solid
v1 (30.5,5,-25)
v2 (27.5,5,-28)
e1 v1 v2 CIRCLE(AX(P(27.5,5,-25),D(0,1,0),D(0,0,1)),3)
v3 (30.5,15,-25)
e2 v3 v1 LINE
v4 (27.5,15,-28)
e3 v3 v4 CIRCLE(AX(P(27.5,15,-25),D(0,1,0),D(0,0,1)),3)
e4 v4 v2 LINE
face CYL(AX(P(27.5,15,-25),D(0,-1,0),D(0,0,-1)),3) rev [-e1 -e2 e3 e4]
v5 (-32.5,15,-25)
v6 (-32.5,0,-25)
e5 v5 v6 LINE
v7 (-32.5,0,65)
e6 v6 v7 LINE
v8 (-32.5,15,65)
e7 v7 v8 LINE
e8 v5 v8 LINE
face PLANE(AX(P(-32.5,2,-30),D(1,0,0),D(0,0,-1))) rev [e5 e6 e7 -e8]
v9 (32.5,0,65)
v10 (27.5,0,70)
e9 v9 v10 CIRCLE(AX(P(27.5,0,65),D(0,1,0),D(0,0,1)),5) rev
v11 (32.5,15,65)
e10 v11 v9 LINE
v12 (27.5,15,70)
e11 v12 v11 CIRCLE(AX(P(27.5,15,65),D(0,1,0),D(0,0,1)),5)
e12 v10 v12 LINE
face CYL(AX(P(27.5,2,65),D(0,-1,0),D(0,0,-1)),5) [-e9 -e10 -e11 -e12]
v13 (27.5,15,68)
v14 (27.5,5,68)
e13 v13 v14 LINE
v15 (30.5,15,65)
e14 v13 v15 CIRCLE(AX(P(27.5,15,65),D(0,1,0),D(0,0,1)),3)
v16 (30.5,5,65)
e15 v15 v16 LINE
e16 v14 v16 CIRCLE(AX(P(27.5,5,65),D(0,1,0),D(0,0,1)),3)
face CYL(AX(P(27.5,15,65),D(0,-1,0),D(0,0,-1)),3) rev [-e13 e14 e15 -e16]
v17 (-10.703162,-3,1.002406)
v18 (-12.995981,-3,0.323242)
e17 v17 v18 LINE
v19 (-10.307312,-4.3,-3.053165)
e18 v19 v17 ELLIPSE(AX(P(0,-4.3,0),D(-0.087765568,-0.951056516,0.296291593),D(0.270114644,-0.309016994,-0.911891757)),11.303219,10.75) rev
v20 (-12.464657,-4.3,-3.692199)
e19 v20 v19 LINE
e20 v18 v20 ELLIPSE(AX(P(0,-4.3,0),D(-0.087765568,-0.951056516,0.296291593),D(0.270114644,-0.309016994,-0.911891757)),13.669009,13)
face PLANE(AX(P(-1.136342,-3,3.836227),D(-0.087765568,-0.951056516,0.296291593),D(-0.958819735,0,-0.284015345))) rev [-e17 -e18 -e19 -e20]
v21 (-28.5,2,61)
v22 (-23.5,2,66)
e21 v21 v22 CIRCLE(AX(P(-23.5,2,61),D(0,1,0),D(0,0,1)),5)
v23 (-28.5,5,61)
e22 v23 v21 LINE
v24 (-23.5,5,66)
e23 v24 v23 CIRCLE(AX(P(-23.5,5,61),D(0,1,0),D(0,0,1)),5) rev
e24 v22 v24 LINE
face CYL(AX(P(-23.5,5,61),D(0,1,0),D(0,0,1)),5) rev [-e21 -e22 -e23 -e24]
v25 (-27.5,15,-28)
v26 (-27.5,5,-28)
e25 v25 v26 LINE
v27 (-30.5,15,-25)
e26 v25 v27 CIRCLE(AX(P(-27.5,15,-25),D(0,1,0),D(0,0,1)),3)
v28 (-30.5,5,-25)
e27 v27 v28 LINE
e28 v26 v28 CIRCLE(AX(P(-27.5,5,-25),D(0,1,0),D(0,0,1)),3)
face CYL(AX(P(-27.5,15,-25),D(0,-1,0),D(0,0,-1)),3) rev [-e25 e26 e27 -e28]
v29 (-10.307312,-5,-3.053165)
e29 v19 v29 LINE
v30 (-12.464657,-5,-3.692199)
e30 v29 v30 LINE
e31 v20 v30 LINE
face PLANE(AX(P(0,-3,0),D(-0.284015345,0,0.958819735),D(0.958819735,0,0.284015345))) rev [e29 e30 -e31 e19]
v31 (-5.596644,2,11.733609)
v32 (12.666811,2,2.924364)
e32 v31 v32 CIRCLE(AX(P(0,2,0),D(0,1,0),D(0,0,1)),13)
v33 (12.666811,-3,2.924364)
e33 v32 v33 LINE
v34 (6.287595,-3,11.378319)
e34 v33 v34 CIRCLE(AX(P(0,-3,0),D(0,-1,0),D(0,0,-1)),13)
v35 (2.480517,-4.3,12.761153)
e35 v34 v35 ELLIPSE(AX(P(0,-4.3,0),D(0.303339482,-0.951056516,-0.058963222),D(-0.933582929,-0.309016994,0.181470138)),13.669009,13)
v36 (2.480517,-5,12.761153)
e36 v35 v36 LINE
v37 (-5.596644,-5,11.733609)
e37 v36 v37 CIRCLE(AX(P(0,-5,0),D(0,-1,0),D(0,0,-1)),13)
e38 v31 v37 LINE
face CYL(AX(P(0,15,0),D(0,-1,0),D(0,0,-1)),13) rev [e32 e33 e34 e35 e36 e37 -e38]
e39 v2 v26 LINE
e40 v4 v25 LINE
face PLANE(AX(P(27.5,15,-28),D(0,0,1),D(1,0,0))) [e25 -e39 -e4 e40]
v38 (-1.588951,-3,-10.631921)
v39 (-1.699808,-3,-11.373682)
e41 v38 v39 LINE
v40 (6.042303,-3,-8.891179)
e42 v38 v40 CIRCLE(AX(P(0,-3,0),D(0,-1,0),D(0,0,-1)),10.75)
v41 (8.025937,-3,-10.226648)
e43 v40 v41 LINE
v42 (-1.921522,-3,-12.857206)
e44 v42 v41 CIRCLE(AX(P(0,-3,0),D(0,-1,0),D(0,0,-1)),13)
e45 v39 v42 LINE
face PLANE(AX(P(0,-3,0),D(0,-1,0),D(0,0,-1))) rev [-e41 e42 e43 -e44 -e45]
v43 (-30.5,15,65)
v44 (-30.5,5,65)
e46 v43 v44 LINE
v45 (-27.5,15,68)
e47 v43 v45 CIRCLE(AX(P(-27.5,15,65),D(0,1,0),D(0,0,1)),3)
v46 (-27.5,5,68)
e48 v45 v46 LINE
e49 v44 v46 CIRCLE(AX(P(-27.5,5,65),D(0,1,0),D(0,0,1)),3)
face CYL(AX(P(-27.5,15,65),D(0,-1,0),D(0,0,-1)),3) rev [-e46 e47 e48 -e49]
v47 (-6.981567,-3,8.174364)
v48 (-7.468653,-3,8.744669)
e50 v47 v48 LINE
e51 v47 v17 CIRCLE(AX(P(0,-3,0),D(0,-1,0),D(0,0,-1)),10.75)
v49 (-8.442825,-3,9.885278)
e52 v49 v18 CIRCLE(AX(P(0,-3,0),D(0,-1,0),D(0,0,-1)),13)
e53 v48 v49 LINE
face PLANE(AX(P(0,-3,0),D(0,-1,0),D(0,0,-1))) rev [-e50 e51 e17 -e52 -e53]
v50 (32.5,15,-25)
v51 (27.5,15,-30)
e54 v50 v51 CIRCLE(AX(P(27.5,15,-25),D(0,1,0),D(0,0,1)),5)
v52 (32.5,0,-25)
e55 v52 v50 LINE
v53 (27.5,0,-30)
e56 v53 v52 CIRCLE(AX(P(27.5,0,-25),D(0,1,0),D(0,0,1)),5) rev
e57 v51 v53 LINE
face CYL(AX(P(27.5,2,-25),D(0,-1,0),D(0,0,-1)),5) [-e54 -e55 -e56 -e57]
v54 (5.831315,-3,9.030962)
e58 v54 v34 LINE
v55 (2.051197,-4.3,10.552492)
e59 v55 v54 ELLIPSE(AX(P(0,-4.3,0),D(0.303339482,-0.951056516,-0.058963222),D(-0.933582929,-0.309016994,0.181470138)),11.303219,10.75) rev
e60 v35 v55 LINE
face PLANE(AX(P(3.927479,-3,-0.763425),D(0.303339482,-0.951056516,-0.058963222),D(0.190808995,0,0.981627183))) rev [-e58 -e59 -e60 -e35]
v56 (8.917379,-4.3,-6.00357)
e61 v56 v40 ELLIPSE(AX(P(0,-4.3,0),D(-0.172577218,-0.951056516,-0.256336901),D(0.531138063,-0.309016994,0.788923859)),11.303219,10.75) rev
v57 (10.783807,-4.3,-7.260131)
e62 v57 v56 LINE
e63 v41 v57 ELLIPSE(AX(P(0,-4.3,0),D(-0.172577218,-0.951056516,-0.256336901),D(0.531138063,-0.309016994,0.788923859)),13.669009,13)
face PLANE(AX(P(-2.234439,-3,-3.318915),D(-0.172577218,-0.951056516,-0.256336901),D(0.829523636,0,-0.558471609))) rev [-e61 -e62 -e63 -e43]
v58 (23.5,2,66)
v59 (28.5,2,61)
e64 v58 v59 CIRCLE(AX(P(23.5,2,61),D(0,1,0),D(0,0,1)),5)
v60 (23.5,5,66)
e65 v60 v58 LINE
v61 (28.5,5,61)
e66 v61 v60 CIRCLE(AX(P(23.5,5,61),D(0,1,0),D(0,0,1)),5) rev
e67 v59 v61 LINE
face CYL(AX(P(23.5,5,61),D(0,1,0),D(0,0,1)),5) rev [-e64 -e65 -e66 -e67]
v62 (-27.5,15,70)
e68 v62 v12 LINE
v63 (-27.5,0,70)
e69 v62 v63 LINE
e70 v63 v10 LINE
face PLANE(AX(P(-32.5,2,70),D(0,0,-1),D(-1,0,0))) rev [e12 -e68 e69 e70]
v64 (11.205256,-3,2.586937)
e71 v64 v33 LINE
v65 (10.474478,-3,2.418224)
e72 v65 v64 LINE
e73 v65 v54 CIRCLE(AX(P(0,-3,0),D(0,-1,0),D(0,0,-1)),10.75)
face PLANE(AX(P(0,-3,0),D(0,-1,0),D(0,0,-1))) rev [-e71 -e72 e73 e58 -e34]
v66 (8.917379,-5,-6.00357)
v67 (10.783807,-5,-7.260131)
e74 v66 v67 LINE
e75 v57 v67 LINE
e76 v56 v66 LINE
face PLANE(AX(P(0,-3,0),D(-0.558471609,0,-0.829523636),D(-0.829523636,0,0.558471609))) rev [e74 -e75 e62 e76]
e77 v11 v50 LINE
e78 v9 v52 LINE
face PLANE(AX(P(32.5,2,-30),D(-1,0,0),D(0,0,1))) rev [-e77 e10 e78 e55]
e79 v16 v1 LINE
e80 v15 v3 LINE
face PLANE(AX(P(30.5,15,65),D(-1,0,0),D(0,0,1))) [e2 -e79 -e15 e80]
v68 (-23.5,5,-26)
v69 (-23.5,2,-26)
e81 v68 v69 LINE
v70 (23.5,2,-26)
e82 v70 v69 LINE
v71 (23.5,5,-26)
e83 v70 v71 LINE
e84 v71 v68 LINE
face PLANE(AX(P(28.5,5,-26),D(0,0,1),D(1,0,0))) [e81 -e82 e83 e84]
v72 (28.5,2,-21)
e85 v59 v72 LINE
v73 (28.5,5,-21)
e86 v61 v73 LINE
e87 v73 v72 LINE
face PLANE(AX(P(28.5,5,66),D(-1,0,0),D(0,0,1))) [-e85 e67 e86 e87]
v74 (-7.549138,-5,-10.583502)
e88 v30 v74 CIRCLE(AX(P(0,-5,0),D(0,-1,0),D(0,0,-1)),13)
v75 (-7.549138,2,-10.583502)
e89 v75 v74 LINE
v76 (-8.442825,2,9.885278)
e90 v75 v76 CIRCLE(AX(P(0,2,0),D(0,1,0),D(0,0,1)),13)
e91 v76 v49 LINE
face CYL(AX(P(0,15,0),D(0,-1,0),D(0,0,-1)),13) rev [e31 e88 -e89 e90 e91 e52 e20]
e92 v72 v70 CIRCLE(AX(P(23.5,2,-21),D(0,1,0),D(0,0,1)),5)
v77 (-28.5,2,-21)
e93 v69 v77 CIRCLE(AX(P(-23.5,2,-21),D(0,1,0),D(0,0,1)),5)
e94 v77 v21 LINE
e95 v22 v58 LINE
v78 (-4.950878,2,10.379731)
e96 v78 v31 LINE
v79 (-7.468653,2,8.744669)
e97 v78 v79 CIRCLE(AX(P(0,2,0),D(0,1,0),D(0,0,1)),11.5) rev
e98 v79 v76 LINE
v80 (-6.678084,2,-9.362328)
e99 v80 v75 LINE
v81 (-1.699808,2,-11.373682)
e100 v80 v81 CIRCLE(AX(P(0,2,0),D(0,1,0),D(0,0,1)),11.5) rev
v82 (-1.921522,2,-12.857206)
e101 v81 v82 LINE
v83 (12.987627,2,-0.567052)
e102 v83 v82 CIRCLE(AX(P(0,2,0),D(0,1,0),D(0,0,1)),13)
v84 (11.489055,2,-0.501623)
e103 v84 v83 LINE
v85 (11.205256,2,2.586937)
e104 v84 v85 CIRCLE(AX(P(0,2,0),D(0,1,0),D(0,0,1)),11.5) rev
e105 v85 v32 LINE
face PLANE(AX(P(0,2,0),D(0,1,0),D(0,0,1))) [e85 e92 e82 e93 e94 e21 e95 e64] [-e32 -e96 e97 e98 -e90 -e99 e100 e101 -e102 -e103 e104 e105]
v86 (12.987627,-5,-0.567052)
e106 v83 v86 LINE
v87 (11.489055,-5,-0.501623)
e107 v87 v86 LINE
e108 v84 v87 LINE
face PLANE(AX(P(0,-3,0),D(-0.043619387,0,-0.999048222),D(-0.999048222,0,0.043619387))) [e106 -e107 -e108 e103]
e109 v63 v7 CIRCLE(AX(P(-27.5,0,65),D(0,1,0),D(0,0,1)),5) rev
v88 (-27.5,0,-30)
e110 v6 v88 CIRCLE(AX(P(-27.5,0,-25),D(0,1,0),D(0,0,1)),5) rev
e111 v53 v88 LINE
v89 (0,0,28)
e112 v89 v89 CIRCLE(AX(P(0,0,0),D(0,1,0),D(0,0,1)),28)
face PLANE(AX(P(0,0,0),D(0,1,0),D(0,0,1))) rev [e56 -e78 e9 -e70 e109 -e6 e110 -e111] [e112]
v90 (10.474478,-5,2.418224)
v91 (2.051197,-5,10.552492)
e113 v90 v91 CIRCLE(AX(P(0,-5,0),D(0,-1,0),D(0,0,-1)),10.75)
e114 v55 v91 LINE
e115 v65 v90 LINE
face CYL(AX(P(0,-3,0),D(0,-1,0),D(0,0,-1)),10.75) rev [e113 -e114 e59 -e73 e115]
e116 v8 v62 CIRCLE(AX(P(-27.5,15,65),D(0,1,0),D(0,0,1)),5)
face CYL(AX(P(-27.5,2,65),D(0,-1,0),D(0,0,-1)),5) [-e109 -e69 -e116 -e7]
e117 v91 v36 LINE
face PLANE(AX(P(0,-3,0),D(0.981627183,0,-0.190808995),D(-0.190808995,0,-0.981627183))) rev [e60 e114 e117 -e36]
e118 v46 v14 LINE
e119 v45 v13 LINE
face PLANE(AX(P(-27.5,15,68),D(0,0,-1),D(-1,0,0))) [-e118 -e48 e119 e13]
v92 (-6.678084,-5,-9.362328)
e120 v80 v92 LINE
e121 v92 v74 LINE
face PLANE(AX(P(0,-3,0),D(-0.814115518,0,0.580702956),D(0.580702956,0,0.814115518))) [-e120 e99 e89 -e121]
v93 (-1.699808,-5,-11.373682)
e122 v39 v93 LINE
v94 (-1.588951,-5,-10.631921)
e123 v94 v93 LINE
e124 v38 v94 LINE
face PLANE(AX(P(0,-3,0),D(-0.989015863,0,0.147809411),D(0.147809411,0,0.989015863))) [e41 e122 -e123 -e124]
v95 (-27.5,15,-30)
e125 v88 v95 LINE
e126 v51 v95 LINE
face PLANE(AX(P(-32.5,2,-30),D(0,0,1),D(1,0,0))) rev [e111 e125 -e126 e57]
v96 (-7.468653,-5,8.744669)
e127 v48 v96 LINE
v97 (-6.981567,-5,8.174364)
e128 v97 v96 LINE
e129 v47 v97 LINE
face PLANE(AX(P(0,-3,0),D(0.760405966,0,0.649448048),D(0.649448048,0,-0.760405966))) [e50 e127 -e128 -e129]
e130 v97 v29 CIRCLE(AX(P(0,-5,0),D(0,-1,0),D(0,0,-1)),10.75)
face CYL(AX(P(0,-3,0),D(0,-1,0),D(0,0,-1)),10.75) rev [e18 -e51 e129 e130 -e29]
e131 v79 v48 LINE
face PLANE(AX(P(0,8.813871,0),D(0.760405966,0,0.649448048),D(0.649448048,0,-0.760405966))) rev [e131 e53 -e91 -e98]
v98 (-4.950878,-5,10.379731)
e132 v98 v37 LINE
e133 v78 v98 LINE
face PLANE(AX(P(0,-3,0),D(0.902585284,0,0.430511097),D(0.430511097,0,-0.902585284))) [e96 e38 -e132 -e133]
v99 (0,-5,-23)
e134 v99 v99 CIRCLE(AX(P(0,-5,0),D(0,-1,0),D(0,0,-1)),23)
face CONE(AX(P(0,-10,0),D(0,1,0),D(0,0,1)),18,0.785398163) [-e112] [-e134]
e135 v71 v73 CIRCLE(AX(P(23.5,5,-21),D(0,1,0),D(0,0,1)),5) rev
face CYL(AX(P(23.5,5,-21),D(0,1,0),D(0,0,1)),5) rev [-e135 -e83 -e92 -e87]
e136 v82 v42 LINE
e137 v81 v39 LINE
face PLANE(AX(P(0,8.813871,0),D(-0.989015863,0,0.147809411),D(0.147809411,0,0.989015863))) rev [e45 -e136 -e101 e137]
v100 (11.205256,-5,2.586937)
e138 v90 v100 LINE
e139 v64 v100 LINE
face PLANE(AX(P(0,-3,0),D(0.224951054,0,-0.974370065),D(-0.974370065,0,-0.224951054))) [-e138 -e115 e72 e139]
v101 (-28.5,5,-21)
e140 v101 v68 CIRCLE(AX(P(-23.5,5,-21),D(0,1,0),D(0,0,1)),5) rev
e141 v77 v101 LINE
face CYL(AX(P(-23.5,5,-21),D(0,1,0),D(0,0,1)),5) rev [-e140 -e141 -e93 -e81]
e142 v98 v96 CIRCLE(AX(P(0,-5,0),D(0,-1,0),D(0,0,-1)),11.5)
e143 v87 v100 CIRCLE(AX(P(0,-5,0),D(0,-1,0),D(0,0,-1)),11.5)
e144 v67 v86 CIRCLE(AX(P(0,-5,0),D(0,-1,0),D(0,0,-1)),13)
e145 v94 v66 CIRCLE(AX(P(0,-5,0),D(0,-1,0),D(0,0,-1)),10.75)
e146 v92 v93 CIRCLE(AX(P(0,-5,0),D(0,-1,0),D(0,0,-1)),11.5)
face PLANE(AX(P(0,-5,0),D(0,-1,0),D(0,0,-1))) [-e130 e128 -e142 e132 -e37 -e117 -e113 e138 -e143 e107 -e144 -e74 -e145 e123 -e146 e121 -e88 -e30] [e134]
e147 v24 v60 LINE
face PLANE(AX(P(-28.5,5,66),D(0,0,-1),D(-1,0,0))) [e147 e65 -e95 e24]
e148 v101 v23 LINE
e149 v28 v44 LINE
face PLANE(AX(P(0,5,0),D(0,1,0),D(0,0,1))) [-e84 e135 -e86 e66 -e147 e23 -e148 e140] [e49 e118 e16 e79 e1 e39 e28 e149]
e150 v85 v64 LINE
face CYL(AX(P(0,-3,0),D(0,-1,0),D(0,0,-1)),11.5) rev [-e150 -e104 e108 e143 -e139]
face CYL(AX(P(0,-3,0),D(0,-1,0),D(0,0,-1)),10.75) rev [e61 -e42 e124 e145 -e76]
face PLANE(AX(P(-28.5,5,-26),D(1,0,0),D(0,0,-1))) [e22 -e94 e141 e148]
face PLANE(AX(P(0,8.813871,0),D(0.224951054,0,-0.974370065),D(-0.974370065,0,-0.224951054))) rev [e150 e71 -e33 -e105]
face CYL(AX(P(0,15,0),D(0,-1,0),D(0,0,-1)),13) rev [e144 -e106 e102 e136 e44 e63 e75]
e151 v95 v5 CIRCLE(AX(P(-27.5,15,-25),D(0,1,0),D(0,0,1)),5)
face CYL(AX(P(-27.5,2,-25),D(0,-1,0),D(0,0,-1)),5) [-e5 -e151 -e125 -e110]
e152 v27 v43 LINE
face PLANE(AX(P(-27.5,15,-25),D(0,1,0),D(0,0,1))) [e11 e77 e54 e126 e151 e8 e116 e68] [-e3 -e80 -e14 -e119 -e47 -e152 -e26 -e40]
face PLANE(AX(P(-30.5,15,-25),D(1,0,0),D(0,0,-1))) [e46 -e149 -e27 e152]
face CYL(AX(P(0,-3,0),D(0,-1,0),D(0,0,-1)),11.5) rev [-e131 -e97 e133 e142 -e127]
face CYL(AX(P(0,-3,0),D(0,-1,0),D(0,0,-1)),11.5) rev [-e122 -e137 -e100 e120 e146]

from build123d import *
from OCP.BRepFilletAPI import BRepFilletAPI_MakeChamfer

# Parameters (mm, degrees)
SKETCH1_W           = 65
SKETCH1_H           = 100
BOSS_EXTRUDE1_DEPTH = 2
SKETCH2_W           = 65
SKETCH2_H           = 100
SKETCH2_W_2         = 57
SKETCH2_H_2         = 92
BOSS_EXTRUDE2_DEPTH = 3
FILLET1_R           = 5
BOSS_EXTRUDE3_DEPTH = 10
SKETCH6_R           = 18
BOSS_EXTRUDE4_DEPTH = 5
CHAMFER1_SIZE       = 10
SKETCH7_R           = 13
CUT_EXTRUDE1_DEPTH  = 80.726093596
BOSS_EXTRUDE6_DEPTH = 2
BOSS_EXTRUDE7_DEPTH = 7
CHAMFER2_SIZE       = 1.3
CHAMFER2_SIZE2      = 4.000988598


with BuildPart() as part:
    # Sketch1 → Boss-Extrude1 (new body)
    with BuildSketch(Plane(origin=(0, 0, 0), x_dir=(1, 0, 0), z_dir=(0, 1, 0))):
        with Locations((0, -20)):
            Rectangle(SKETCH1_W, SKETCH1_H)
    extrude(amount=BOSS_EXTRUDE1_DEPTH)

    # Sketch2 → Boss-Extrude2 (add)
    with BuildSketch(Plane(origin=(0, 2, 0), x_dir=(1, 0, 0), z_dir=(0, 1, 0))):
        with Locations((0, -20)):
            Rectangle(SKETCH2_W, SKETCH2_H)
        with Locations((0, -20)):
            Rectangle(SKETCH2_W_2, SKETCH2_H_2, mode=Mode.SUBTRACT)
    extrude(amount=BOSS_EXTRUDE2_DEPTH)

    # Fillet1
    fillet1_edges = [part.edges().sort_by_distance(p)[0] for p in [
        (-28.5, 3.5, 66),
        (28.5, 3.5, 66),
        (28.5, 3.5, -26),
        (-28.5, 3.5, -26),
        (-32.5, 2.5, -30),
        (32.5, 2.5, -30),
        (32.5, 2.5, 70),
        (-32.5, 2.5, 70),
    ]]
    fillet(fillet1_edges, radius=FILLET1_R)

    # Sketch4 → Boss-Extrude3 (add)
    with BuildSketch(Plane(origin=(0, 5, 0), x_dir=(1, 0, 0), z_dir=(0, 1, 0))):
        with BuildLine():
            Line((-32.5, 25), (-32.5, -65))
            ThreePointArc((-32.5, -65), (-31.035533906, -68.535533906), (-27.5, -70))
            Line((-27.5, -70), (27.5, -70))
            ThreePointArc((27.5, -70), (31.035533906, -68.535533906), (32.5, -65))
            Line((32.5, -65), (32.5, 25))
            ThreePointArc((32.5, 25), (31.035533906, 28.535533906), (27.5, 30))
            Line((27.5, 30), (-27.5, 30))
            ThreePointArc((-27.5, 30), (-31.035533906, 28.535533906), (-32.5, 25))
        make_face()
        with BuildLine():
            Line((-30.5, 25), (-30.5, -65))
            ThreePointArc((-30.5, -65), (-29.621320344, -67.121320344), (-27.5, -68))
            Line((-27.5, -68), (27.5, -68))
            ThreePointArc((27.5, -68), (29.621320344, -67.121320344), (30.5, -65))
            Line((30.5, -65), (30.5, 25))
            ThreePointArc((30.5, 25), (29.621320344, 27.121320344), (27.5, 28))
            Line((27.5, 28), (-27.5, 28))
            ThreePointArc((-27.5, 28), (-29.621320344, 27.121320344), (-30.5, 25))
        make_face(mode=Mode.SUBTRACT)
    extrude(amount=BOSS_EXTRUDE3_DEPTH)

    # Sketch6 → Boss-Extrude4 (add)
    with BuildSketch(Plane(origin=(0, -5, 0), x_dir=(-1, 0, 0), z_dir=(0, -1, 0))):
        with Locations(Location((0, 0, 0), (0, 0, 90))):
            Circle(SKETCH6_R)
    extrude(amount=-BOSS_EXTRUDE4_DEPTH)

    # Chamfer1
    # the kernel refuses this chamfer: 10 mm, written as the material it adds along each edge
    with BuildSketch(Plane(origin=(0, 0, 0), x_dir=(0, 0, -1), z_dir=(-1, 0, 0))) as chamfer1_piece_1_section:
        Polygon((18 + CHAMFER1_SIZE, 0), (18, CHAMFER1_SIZE), (18, 0), align=None)
    chamfer1_piece_1 = revolve(axis=Axis((0, 0, 0), (0, -1, 0)), mode=Mode.PRIVATE)
    chamfer1_piece_1 = split(chamfer1_piece_1, bisect_by=Plane(origin=(0, -5, 25.515578953), z_dir=(0, 1, 0)), keep=Keep.TOP, mode=Mode.PRIVATE)
    add(chamfer1_piece_1)

    # Sketch7 → Cut-Extrude1 (cut, through all)
    with BuildSketch(Plane.XZ.offset(5)):
        with Locations(Location((0, 0, 0), (0, 0, 270))):
            Circle(SKETCH7_R)
    extrude(amount=-CUT_EXTRUDE1_DEPTH, mode=Mode.SUBTRACT)

    # Sketch8 → Boss-Extrude6 (add)
    with BuildSketch(Plane(origin=(0, -5, 0), x_dir=(-1, 0, 0), z_dir=(0, -1, 0))):
        with BuildLine():
            ThreePointArc((-9.53952181, 6.422423502), (-4.636164201, 10.524066776), (1.699808228, 11.373682429))
            Line((1.699808228, 11.373682429), (1.921522345, 12.857206224))
            ThreePointArc((1.921522345, 12.857206224), (-5.240881271, 11.896771138), (-10.783807263, 7.260130916))
            Line((-10.783807263, 7.260130916), (-9.53952181, 6.422423502))
        make_face()
        with BuildLine():
            Line((1.921522345, 12.857206224), (1.699808228, 11.373682429))
            ThreePointArc((1.699808228, 11.373682429), (4.307975824, 10.662614328), (6.678083991, 9.362328461))
            Line((6.678083991, 9.362328461), (7.549138424, 10.583501739))
            ThreePointArc((7.549138424, 10.583501739), (4.869885714, 12.053390109), (1.921522345, 12.857206224))
        make_face()
        with BuildLine():
            Line((12.464656553, 3.692199481), (11.026426951, 3.266176464))
            ThreePointArc((11.026426951, 3.266176464), (11.380990948, 1.650165153), (11.5, 0))
            ThreePointArc((11.5, 0), (10.443646499, -4.814586982), (7.468652556, -8.744668604))
            Line((7.468652556, -8.744668604), (8.442824628, -9.885277553))
            ThreePointArc((8.442824628, -9.885277553), (11.80586126, -5.442576588), (13, 0))
            ThreePointArc((13, 0), (12.865468029, 1.865404086), (12.464656553, 3.692199481))
        make_face()
        with BuildLine():
            ThreePointArc((7.468652556, -8.744668604), (6.263348903, -9.644711531), (4.950877613, -10.37973077))
            Line((4.950877613, -10.37973077), (5.596644259, -11.733608697))
            ThreePointArc((5.596644259, -11.733608697), (7.080307455, -10.902717383), (8.442824628, -9.885277553))
            Line((8.442824628, -9.885277553), (7.468652556, -8.744668604))
        make_face()
        with BuildLine():
            ThreePointArc((-8.917379083, 6.003569796), (-4.333805666, 9.837714595), (1.58895117, 10.631920531))
            Line((1.58895117, 10.631920531), (1.699808228, 11.373682429))
            ThreePointArc((1.699808228, 11.373682429), (-4.636164201, 10.524066776), (-9.53952181, 6.422423502))
            Line((-9.53952181, 6.422423502), (-8.917379083, 6.003569796))
        make_face()
        with BuildLine():
            Line((11.026426951, 3.266176464), (10.30731215, 3.053164956))
            ThreePointArc((10.30731215, 3.053164956), (10.638752408, 1.542545686), (10.75, 0))
            ThreePointArc((10.75, 0), (9.762539119, -4.500592179), (6.98156652, -8.17436413))
            Line((6.98156652, -8.17436413), (7.468652556, -8.744668604))
            ThreePointArc((7.468652556, -8.744668604), (10.443646499, -4.814586982), (11.5, 0))
            ThreePointArc((11.5, 0), (11.380990948, 1.650165153), (11.026426951, 3.266176464))
        make_face()
        with BuildLine():
            Line((-2.48051694, -12.761153385), (-2.194303447, -11.28871261))
            ThreePointArc((-2.194303447, -11.28871261), (-7.98857126, -8.272407704), (-11.205255745, -2.586937125))
            Line((-11.205255745, -2.586937125), (-12.666810842, -2.924363706))
            ThreePointArc((-12.666810842, -2.924363706), (-9.030558816, -9.351417404), (-2.48051694, -12.761153385))
        make_face()
        with BuildLine():
            Line((-2.194303447, -11.28871261), (-2.0511967, -10.552492222))
            ThreePointArc((-2.0511967, -10.552492222), (-7.467577482, -7.732902854), (-10.474478196, -2.418223834))
            Line((-10.474478196, -2.418223834), (-11.205255745, -2.586937125))
            ThreePointArc((-11.205255745, -2.586937125), (-7.98857126, -8.272407704), (-2.194303447, -11.28871261))
        make_face()
        with BuildLine():
            ThreePointArc((-11.205255745, -2.586937125), (-11.451756667, -1.052268615), (-11.489054548, 0.501622955))
            Line((-11.489054548, 0.501622955), (-12.987626881, 0.567052036))
            ThreePointArc((-12.987626881, 0.567052036), (-12.945464058, -1.189521043), (-12.666810842, -2.924363706))
            Line((-12.666810842, -2.924363706), (-11.205255745, -2.586937125))
        make_face()
    extrude(amount=-BOSS_EXTRUDE6_DEPTH)

    # Sketch8<5> → Boss-Extrude7 (add)
    with BuildSketch(Plane(origin=(0, -5, 0), x_dir=(-1, 0, 0), z_dir=(0, -1, 0))):
        with BuildLine():
            Line((1.921522345, 12.857206224), (1.699808228, 11.373682429))
            ThreePointArc((1.699808228, 11.373682429), (4.307975824, 10.662614328), (6.678083991, 9.362328461))
            Line((6.678083991, 9.362328461), (7.549138424, 10.583501739))
            ThreePointArc((7.549138424, 10.583501739), (4.869885714, 12.053390109), (1.921522345, 12.857206224))
        make_face()
        with BuildLine():
            ThreePointArc((7.468652556, -8.744668604), (6.263348903, -9.644711531), (4.950877613, -10.37973077))
            Line((4.950877613, -10.37973077), (5.596644259, -11.733608697))
            ThreePointArc((5.596644259, -11.733608697), (7.080307455, -10.902717383), (8.442824628, -9.885277553))
            Line((8.442824628, -9.885277553), (7.468652556, -8.744668604))
        make_face()
        with BuildLine():
            ThreePointArc((-11.205255745, -2.586937125), (-11.451756667, -1.052268615), (-11.489054548, 0.501622955))
            Line((-11.489054548, 0.501622955), (-12.987626881, 0.567052036))
            ThreePointArc((-12.987626881, 0.567052036), (-12.945464058, -1.189521043), (-12.666810842, -2.924363706))
            Line((-12.666810842, -2.924363706), (-11.205255745, -2.586937125))
        make_face()
    extrude(amount=-BOSS_EXTRUDE7_DEPTH)

    # Chamfer2: one chamfer whose edges measure the first distance from different faces: ONE call of the kernel's chamfer builder (chamfer() names one face for all edges)
    chamfer2_edges_1 = [part.edges().sort_by_distance(p)[0] for p in [
        (9.850593173, -3, -6.631850356),
    ]]
    chamfer2_side_1 = [part.faces().sort_by_distance(p)[0] for p in [
        (9.850593173, -4, -6.631850356),
    ]]
    chamfer2_edges_2 = [part.edges().sort_by_distance(p)[0] for p in [
        (-11.385984352, -3, -3.372682218),
    ]]
    chamfer2_side_2 = [part.faces().sort_by_distance(p)[0] for p in [
        (-11.385984352, -4, -3.372682218),
    ]]
    chamfer2_edges_3 = [part.edges().sort_by_distance(p)[0] for p in [
        (2.26585682, -3, 11.656822803),
    ]]
    chamfer2_side_3 = [part.faces().sort_by_distance(p)[0] for p in [
        (2.26585682, -4, 11.656822803),
    ]]
    chamfer2 = BRepFilletAPI_MakeChamfer(part.part.solid().wrapped)
    for e in chamfer2_edges_1:
        chamfer2.Add(CHAMFER2_SIZE, CHAMFER2_SIZE2, e.wrapped, chamfer2_side_1[0].wrapped)  # the first distance lies on this face
    for e in chamfer2_edges_2:
        chamfer2.Add(CHAMFER2_SIZE, CHAMFER2_SIZE2, e.wrapped, chamfer2_side_2[0].wrapped)  # the first distance lies on this face
    for e in chamfer2_edges_3:
        chamfer2.Add(CHAMFER2_SIZE, CHAMFER2_SIZE2, e.wrapped, chamfer2_side_3[0].wrapped)  # the first distance lies on this face
    add(Compound.cast(chamfer2.Shape()), mode=Mode.REPLACE)


solid = part.part
